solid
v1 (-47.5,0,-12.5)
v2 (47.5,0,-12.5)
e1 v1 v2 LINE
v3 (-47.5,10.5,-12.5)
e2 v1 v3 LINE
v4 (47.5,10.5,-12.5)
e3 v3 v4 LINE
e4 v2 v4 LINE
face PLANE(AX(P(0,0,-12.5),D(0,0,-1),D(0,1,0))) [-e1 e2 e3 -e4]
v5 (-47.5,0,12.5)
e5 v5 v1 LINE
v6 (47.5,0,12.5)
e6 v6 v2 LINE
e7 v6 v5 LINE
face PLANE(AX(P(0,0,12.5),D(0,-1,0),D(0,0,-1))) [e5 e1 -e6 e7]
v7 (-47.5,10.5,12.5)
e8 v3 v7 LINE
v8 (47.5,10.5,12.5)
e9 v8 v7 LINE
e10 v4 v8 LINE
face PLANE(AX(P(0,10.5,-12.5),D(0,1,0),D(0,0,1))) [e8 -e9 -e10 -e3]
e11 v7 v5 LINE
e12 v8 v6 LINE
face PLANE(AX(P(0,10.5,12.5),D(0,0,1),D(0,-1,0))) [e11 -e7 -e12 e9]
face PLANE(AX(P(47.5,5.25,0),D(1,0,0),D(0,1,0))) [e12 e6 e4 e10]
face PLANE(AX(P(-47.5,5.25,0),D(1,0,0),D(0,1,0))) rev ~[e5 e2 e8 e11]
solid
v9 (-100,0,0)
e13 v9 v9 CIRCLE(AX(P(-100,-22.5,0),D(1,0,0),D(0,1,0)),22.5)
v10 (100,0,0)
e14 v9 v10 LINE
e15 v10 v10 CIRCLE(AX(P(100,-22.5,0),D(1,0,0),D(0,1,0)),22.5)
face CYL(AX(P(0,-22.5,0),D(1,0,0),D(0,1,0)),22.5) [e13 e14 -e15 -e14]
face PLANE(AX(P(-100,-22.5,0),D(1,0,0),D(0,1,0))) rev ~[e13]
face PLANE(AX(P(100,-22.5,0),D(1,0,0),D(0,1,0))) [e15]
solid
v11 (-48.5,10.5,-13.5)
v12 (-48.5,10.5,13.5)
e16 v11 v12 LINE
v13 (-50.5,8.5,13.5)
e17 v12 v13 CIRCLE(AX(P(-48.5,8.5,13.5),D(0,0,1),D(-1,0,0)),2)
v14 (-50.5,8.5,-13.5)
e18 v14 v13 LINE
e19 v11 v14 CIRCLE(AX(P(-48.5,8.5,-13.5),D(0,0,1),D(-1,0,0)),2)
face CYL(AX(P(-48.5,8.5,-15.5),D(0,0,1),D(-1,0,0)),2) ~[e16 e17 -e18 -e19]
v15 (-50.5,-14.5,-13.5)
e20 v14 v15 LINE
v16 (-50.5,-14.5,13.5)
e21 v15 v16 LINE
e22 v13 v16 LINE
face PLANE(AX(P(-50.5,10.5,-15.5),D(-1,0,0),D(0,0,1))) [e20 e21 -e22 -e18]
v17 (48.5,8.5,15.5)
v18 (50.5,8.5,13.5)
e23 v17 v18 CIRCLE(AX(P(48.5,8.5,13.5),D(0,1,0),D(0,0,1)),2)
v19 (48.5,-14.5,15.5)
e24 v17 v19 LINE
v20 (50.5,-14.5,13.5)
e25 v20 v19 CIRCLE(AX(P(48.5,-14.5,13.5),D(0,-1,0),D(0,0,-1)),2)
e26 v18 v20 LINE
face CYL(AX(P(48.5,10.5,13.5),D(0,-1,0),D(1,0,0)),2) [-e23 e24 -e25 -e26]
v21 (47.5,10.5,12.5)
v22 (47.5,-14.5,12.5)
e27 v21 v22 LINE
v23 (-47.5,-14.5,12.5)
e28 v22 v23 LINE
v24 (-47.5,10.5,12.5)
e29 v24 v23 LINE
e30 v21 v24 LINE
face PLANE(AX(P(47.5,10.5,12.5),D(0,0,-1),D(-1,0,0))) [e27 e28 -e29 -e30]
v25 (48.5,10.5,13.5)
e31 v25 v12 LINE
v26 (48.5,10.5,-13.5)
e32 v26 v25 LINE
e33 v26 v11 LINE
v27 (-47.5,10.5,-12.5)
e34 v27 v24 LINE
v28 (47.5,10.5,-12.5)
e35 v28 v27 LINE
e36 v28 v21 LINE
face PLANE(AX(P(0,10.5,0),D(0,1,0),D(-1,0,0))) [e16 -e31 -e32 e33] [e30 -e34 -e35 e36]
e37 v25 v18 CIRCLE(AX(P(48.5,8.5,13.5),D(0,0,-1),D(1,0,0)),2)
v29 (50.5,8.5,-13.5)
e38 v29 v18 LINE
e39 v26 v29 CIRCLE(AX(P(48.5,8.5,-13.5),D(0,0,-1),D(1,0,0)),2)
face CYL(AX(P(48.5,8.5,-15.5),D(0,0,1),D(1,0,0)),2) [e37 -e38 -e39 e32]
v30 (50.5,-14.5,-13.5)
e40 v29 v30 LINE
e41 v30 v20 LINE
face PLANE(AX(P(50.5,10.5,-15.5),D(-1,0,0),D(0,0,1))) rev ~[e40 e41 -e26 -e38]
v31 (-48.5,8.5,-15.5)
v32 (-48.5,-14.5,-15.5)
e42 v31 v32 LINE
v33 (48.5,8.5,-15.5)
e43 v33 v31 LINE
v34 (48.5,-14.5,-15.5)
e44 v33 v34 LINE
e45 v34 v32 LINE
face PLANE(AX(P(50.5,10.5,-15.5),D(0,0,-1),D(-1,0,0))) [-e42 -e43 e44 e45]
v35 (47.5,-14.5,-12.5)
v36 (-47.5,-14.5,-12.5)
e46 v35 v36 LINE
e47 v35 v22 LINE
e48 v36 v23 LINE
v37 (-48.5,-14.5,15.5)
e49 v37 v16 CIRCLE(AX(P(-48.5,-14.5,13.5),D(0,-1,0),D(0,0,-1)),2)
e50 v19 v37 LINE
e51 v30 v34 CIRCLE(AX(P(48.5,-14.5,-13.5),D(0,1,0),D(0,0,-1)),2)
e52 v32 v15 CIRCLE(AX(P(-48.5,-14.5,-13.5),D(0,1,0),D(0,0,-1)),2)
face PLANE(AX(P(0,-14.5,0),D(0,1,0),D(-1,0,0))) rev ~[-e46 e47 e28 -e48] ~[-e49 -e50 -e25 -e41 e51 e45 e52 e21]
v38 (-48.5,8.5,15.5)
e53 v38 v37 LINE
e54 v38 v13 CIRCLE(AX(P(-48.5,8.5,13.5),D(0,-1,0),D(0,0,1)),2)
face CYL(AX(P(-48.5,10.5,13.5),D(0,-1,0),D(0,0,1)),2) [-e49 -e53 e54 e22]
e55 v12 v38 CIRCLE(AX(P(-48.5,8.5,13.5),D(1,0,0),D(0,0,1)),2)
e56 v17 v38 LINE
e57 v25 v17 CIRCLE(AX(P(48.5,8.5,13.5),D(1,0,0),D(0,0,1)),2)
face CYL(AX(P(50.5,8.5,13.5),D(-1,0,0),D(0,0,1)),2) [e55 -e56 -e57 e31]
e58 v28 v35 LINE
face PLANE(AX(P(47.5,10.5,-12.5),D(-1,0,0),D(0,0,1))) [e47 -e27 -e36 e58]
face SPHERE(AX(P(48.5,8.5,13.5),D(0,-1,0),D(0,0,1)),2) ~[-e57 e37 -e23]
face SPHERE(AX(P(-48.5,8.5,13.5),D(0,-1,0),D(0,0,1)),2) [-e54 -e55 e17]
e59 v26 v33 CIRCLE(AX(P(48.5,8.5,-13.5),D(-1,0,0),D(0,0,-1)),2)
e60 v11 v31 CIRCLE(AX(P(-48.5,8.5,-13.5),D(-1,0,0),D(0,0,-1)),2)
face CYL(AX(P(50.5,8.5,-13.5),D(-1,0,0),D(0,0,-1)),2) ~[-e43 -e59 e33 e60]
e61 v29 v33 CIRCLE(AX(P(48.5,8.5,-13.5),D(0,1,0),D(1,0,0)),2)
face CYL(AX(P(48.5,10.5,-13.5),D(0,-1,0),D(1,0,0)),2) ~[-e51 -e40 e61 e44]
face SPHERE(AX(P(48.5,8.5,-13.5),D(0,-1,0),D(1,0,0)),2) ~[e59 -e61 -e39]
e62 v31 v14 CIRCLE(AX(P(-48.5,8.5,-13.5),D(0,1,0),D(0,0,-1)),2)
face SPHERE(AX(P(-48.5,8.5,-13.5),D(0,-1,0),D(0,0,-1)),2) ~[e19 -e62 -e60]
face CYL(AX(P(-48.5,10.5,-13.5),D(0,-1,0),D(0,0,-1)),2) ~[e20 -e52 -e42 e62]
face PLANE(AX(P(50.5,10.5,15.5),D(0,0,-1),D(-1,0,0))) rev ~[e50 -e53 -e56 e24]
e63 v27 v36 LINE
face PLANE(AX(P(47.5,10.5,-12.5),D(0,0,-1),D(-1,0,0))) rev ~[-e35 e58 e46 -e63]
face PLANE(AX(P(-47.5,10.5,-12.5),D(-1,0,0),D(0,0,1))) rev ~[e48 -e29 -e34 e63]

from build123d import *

# Parameters (mm, degrees)
F0_R     = 22.5
F1_DEPTH = 100
F2_DEPTH = 47.5
F3_W     = 101
F3_H     = 31
F3_W_2   = 95
F3_H_2   = 25
F4_DEPTH = 25
F5_R     = 2


with BuildPart() as f1:
    # F0 (on Right) → F1 (new body, symmetric)
    with BuildSketch(Plane.YZ):
        with Locations((-22.5, 0)):
            Circle(F0_R)
    extrude(amount=F1_DEPTH, both=True)


with BuildPart() as f2:
    # F0 (on Right) → F2 (new body, symmetric)
    with BuildSketch(Plane.YZ):
        Polygon((0, 12.5), (0, 0), (0, -12.5), (10.5, -12.5), (10.5, 12.5), align=None)
    extrude(amount=F2_DEPTH, both=True)


with BuildPart() as f4:
    # F3 (on face) → F4 (new body)
    with BuildSketch(Plane(origin=(0, 10.5, 0), x_dir=(-1, 0, 0), z_dir=(0, 1, 0))):
        Rectangle(F3_W, F3_H)
        Rectangle(F3_W_2, F3_H_2, mode=Mode.SUBTRACT)
    extrude(amount=-F4_DEPTH)

    # F5
    f5_edges = [f4.edges().sort_by_distance(p)[0] for p in [
        (50.5, -2, 15.5),
        (50.5, -2, -15.5),
        (-50.5, -2, 15.5),
        (-50.5, -2, -15.5),
        (0, 10.5, 15.5),
        (50.5, 10.5, 0),
        (0, 10.5, -15.5),
        (-50.5, 10.5, 0),
    ]]
    fillet(f5_edges, radius=F5_R)


solid = Compound([f1.part, f2.part, f4.part])
